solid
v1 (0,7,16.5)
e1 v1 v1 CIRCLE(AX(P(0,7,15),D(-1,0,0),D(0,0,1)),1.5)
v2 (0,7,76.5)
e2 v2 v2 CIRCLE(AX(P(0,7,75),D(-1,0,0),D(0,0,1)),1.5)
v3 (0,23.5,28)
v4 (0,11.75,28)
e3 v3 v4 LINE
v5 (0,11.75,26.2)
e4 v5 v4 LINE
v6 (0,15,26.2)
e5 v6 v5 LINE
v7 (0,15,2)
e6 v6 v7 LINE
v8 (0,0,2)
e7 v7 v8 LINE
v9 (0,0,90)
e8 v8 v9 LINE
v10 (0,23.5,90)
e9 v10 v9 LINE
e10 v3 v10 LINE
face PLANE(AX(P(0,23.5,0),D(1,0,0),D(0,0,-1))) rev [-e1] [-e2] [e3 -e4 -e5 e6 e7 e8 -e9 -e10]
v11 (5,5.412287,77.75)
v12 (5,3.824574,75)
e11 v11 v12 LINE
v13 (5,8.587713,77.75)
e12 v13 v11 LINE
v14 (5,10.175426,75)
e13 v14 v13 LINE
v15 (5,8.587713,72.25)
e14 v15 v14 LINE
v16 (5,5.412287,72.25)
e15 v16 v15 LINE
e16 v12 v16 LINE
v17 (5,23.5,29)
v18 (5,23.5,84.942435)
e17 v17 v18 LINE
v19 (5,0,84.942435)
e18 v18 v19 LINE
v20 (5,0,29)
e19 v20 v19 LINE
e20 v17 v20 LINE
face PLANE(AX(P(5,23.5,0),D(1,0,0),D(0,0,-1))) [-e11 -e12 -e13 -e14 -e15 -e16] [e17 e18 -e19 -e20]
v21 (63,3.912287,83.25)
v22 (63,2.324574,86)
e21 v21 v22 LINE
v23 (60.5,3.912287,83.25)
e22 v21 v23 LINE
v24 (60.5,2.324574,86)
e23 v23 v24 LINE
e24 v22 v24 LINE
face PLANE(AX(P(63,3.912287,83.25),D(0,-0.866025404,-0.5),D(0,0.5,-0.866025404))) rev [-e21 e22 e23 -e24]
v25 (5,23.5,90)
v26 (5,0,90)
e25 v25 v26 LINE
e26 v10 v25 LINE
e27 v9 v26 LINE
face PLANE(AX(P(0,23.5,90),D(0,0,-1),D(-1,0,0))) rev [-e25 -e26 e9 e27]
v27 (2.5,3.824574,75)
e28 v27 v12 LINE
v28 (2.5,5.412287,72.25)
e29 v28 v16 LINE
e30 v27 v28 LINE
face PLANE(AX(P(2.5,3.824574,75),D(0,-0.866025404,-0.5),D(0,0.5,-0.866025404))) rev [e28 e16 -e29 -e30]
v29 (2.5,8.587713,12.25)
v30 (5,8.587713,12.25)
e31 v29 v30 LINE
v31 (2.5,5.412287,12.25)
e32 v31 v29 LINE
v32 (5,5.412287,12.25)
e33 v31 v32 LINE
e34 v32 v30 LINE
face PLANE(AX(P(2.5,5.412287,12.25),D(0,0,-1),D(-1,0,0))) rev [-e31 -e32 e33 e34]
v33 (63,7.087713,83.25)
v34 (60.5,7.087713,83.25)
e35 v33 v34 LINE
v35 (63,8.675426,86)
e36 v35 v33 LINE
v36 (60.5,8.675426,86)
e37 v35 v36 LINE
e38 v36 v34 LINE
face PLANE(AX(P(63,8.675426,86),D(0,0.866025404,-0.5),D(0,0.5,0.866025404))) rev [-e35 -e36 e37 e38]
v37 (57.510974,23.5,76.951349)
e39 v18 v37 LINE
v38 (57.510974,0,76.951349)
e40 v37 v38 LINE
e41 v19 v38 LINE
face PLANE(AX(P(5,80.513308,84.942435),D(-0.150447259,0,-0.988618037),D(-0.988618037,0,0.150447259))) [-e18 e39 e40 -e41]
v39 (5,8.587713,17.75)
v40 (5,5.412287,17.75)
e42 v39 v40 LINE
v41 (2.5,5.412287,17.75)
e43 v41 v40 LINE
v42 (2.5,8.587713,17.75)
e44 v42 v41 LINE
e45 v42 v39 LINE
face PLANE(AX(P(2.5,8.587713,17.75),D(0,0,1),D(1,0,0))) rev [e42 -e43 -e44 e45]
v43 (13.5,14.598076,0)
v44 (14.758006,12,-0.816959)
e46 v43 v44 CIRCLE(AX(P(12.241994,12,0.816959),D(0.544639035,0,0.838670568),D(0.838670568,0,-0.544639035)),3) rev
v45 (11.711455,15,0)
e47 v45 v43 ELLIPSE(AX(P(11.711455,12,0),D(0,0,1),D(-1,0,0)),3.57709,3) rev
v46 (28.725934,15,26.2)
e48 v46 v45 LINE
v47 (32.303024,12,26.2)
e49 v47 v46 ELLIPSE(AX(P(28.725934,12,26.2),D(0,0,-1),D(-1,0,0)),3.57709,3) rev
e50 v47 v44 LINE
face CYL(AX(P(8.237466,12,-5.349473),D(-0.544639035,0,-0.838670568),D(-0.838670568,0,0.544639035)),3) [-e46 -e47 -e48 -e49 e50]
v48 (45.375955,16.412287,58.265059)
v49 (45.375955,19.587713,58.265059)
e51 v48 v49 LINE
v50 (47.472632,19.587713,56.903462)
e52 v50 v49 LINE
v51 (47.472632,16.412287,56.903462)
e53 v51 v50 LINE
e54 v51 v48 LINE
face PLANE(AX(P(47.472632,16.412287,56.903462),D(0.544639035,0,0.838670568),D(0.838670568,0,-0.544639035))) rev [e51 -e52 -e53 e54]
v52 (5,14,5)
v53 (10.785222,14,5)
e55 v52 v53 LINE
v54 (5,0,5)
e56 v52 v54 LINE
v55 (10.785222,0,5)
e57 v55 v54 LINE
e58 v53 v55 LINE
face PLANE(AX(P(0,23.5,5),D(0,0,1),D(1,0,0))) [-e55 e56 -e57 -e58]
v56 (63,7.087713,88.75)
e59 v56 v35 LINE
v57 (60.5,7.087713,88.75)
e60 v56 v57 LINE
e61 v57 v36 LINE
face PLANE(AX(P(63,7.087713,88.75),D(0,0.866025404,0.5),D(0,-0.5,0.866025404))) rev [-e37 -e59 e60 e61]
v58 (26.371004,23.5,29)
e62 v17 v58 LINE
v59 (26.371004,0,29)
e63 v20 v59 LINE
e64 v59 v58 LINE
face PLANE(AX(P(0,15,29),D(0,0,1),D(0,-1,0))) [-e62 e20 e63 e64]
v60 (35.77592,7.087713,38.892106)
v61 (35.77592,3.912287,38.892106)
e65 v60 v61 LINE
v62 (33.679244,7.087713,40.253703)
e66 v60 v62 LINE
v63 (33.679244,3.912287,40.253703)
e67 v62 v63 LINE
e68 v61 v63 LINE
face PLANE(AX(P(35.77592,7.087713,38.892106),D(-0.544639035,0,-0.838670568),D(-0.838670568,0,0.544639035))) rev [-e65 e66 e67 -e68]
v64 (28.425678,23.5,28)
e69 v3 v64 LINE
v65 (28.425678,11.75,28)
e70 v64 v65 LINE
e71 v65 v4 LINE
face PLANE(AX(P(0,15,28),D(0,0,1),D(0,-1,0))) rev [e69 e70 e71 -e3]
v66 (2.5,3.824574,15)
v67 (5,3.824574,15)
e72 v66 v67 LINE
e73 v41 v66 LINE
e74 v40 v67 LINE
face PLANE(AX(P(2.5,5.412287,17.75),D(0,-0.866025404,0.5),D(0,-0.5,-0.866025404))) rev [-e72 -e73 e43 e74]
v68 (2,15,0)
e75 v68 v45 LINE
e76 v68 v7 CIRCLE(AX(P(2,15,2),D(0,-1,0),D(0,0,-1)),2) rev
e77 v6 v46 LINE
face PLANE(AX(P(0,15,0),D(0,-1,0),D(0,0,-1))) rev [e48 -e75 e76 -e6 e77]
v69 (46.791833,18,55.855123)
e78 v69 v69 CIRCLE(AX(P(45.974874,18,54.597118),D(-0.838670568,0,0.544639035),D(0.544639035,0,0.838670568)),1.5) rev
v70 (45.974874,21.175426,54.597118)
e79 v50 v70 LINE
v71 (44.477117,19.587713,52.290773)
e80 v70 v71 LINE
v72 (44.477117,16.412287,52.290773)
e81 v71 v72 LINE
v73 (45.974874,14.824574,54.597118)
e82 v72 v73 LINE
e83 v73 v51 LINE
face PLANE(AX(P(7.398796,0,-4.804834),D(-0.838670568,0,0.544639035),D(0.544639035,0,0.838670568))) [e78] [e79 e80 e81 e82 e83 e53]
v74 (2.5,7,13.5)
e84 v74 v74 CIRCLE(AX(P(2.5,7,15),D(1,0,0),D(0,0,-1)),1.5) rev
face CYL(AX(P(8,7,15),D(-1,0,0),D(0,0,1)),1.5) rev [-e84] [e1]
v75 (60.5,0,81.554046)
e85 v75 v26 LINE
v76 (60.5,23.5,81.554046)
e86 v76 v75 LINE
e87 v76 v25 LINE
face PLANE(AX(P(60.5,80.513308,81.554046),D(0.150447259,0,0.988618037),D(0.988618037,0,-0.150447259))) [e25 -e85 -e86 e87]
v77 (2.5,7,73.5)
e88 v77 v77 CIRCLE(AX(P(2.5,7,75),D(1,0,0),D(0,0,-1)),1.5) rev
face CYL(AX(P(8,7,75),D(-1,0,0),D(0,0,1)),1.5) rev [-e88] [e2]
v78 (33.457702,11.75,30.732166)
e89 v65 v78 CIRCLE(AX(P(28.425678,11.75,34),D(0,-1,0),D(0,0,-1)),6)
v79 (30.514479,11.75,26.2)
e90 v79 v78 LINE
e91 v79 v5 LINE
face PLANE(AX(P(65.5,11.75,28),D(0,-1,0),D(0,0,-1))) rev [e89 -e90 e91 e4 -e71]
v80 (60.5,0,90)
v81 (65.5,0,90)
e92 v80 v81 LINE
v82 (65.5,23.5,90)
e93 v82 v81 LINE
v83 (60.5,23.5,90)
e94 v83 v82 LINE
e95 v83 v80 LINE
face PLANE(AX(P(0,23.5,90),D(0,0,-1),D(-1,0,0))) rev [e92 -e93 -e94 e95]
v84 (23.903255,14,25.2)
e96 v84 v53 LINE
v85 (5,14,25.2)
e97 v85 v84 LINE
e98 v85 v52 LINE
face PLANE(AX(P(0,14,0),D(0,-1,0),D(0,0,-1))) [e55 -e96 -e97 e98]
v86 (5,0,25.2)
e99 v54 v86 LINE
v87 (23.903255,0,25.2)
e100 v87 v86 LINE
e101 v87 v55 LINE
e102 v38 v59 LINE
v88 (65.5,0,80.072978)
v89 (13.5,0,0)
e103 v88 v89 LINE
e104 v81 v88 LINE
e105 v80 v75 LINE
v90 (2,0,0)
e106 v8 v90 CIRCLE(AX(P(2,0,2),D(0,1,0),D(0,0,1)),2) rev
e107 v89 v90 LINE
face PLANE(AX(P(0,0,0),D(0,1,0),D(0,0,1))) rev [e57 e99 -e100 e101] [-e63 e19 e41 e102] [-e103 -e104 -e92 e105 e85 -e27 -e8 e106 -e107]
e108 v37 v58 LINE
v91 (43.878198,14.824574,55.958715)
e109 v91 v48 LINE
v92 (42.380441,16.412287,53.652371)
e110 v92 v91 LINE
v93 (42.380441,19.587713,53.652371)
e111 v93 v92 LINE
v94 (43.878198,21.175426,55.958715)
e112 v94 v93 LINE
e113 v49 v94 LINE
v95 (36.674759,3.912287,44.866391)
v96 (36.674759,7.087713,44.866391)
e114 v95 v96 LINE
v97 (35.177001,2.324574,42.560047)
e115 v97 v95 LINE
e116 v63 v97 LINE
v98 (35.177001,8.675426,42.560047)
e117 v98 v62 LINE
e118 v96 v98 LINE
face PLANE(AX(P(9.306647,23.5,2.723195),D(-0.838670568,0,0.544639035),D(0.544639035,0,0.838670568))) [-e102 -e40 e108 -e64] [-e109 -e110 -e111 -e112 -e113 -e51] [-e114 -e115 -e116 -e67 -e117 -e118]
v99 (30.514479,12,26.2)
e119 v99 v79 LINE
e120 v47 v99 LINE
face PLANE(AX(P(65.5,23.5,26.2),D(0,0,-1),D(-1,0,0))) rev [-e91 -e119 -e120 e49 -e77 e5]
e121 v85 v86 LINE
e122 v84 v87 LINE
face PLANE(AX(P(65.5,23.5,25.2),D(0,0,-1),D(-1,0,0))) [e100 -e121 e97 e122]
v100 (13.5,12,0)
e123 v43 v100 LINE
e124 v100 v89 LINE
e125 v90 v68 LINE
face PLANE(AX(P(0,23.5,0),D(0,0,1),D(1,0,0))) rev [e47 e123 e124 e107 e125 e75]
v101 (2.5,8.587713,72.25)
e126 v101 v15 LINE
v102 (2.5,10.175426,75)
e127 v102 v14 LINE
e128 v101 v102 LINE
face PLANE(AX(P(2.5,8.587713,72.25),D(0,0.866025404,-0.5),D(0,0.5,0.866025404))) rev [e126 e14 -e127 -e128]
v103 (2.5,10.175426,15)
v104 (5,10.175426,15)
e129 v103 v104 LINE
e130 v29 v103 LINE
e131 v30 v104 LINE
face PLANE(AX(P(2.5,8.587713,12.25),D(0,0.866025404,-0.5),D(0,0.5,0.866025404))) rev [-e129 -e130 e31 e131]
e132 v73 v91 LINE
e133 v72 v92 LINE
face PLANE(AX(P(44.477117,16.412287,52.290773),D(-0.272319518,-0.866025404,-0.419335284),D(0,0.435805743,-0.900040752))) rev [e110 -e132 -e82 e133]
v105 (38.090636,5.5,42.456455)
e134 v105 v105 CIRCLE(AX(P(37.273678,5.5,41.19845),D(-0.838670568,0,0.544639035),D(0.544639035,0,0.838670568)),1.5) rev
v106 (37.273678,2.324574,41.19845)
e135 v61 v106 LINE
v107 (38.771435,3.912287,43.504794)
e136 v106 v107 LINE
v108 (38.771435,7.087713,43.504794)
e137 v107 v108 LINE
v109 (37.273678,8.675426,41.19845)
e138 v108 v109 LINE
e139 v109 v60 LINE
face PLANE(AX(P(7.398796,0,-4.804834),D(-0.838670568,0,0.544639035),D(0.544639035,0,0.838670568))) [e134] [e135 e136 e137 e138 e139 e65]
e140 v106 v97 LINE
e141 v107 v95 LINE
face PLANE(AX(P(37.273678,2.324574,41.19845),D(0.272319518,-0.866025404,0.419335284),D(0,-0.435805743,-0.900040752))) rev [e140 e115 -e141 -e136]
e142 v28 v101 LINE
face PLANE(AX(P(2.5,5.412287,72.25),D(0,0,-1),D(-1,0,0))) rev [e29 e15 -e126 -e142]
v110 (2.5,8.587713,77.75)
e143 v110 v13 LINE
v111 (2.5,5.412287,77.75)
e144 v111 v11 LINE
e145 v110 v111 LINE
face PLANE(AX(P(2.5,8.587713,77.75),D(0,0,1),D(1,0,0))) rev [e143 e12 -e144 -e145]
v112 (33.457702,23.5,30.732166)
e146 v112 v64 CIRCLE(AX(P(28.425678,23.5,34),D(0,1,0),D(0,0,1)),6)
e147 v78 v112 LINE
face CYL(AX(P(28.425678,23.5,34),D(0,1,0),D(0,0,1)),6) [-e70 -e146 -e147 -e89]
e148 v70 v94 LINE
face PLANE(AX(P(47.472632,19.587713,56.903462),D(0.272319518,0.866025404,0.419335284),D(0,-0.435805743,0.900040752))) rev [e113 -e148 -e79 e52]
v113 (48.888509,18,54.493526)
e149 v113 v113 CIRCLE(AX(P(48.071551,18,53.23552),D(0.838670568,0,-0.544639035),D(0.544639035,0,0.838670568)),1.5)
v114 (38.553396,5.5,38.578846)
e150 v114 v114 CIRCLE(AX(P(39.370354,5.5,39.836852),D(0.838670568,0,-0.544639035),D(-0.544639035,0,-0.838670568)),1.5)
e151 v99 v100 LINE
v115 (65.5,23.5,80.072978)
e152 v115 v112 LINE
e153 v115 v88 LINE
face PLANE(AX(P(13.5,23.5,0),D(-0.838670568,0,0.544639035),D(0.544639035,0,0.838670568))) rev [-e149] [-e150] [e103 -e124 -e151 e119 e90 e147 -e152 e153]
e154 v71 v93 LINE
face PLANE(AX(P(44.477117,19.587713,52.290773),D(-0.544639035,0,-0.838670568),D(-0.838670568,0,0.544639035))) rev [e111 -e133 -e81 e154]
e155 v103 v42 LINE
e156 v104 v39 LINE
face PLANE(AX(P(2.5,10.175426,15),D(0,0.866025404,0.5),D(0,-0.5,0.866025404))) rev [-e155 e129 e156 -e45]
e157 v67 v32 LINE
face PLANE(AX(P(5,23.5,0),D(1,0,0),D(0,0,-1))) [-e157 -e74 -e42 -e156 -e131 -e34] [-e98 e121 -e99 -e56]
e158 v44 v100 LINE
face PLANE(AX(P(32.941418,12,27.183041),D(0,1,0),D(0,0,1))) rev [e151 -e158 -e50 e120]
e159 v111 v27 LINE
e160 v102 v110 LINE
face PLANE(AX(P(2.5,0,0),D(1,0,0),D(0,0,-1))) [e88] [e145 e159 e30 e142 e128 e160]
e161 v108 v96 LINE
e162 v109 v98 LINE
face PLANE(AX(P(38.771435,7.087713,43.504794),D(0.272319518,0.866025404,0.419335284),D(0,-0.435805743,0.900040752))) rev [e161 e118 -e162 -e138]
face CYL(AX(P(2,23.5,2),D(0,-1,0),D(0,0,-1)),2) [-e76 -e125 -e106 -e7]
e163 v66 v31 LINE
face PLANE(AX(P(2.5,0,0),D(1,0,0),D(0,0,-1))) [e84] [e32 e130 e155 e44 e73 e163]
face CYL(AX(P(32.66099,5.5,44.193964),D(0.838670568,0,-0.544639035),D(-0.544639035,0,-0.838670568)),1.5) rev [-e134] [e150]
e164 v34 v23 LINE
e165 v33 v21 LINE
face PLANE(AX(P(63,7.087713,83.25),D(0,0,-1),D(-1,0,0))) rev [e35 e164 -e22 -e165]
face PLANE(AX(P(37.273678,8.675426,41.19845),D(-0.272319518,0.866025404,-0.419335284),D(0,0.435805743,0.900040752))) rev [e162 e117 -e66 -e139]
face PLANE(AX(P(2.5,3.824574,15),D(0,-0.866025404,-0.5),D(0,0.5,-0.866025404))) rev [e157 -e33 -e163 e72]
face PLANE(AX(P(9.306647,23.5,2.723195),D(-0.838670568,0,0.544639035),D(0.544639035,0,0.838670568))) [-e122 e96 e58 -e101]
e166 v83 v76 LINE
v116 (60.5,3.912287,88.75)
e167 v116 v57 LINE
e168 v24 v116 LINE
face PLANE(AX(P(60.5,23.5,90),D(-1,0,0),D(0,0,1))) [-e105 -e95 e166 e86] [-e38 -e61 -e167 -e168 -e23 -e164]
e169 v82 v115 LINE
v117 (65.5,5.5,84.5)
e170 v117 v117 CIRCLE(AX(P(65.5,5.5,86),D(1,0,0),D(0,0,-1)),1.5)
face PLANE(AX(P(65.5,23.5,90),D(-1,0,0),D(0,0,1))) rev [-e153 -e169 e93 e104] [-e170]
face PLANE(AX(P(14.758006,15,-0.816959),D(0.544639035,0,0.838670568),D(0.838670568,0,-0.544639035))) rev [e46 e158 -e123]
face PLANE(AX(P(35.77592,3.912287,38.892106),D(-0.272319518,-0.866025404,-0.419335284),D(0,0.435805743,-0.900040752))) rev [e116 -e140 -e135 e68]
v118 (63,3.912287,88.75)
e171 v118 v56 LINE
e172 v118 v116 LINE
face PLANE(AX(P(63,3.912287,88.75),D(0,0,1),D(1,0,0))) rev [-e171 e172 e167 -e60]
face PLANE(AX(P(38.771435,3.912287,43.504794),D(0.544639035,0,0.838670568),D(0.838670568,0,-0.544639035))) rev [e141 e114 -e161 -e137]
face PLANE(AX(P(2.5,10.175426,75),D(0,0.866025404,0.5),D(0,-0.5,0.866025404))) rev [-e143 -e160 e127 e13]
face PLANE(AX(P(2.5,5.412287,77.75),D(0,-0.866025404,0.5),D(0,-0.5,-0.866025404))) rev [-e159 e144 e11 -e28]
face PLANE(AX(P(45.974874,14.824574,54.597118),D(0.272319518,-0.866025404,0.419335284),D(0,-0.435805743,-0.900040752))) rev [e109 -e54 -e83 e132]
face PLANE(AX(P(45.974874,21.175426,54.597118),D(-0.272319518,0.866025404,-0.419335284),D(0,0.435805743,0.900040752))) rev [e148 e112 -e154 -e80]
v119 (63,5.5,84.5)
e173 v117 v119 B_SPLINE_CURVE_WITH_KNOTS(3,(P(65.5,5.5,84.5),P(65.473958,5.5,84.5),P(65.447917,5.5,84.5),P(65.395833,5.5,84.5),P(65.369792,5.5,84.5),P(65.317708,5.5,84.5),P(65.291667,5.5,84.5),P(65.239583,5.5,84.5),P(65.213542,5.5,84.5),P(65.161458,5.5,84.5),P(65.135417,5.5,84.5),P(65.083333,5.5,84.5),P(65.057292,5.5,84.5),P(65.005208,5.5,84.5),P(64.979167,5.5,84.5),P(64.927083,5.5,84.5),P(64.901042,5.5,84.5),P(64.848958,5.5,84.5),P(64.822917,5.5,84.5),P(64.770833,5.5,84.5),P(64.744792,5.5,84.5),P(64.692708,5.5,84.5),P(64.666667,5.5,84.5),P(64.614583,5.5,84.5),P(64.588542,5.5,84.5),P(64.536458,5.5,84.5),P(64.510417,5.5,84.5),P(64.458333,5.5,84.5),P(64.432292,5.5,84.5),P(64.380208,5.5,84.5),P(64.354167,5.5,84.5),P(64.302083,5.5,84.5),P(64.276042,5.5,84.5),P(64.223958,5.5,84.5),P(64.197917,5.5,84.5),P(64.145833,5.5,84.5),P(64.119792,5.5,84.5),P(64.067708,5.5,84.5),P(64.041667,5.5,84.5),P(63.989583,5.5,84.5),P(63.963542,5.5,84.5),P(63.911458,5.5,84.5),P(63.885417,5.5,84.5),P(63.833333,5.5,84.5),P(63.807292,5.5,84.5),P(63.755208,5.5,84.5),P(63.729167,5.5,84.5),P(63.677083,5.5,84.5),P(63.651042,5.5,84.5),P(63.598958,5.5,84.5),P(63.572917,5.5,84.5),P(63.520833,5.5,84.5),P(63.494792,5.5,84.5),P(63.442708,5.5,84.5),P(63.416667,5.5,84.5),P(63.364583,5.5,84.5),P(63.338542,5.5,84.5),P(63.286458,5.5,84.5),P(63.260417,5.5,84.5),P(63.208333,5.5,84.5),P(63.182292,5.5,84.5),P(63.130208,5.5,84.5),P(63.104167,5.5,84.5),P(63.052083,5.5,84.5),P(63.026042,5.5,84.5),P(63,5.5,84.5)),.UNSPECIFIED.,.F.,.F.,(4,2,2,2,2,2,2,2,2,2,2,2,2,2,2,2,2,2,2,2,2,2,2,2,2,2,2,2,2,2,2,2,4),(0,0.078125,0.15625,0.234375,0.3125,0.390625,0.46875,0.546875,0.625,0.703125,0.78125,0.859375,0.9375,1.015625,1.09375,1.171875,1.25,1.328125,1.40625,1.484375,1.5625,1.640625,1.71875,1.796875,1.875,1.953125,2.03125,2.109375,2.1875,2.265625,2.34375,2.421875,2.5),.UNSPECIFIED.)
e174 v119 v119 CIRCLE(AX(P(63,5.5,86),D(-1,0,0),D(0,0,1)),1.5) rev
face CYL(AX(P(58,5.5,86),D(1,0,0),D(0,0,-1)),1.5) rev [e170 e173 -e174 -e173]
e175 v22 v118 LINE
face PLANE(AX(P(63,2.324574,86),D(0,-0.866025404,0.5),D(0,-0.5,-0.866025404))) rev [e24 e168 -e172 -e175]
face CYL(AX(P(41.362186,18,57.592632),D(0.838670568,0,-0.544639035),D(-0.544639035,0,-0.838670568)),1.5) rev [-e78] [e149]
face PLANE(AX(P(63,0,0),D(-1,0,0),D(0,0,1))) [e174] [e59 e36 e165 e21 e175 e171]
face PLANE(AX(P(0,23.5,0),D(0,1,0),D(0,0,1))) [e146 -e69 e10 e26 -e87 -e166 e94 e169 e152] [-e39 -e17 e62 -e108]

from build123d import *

# Parameters (mm, degrees)
BOSS_EXTRU_1_DEPTH       = 23.5
ESQUISSE10_W             = 28
ESQUISSE10_H             = 8.5
ENL_V_MAT_EXTRU_9_DEPTH  = 114.765108887
ESQUISSE11_W             = 33.386172199
ESQUISSE11_H             = 3
BOSS_EXTRU_2_DEPTH       = 1.5
ESQUISSE12_W             = 1.8
ESQUISSE12_H             = 11.75
ENL_V_MAT_EXTRU_10_DEPTH = 114.765108887
COQUE2_DEPTH             = 23.5
COQUE2_2_DEPTH           = 10.75
COQUE2_START             = 10.75
COQUE2_3_DEPTH           = 3.25
CONG_2_R                 = 2
CONG_3_R                 = 3
ESQUISSE5_R              = 1.5
ENL_V_MAT_EXTRU_4_DEPTH  = 8
ESQUISSE7_R              = 1.5
ENL_V_MAT_EXTRU_6_DEPTH  = 8
ESQUISSE9_R              = 1.5
ENL_V_MAT_EXTRU_8_DEPTH  = 7.5
BOSS_EXTRU_3_DEPTH       = 23.5
BOSS_EXTRU_4_DEPTH       = 10.75
ENL_V_MAT_EXTRU_11_DEPTH = 2.5
ENL_V_MAT_EXTRU_12_DEPTH = 2.5
ENL_V_MAT_EXTRU_13_DEPTH = 2.5
CONG_5_R                 = 6


# Read off the part's stored shape, not the designer's step: Coque2
with BuildPart() as part:
    # Esquisse1 → Boss.-Extru.1 (new body)
    with BuildSketch(Plane(origin=(0, 0, 0), x_dir=(1, 0, 0), z_dir=(0, 1, 0))):
        Polygon((0, 0), (13.5, 0), (65.5, -80.072978118), (65.5, -90), (0, -90), align=None)
    extrude(amount=BOSS_EXTRU_1_DEPTH)

    # Esquisse10 → Enlèv. mat.-Extru.9 (cut, through all)
    with BuildSketch(Plane(origin=(65.5, 0, 0), x_dir=(0, 0, -1), z_dir=(1, 0, 0))):
        with Locations((-14, 19.25)):
            Rectangle(ESQUISSE10_W, ESQUISSE10_H)
    extrude(amount=-ENL_V_MAT_EXTRU_9_DEPTH, mode=Mode.SUBTRACT)

    # Esquisse11 → Boss.-Extru.2 (add)
    with BuildSketch(Plane(origin=(9.495472341, 0, -6.166431839), x_dir=(-0.5446390350150256, 0, -0.838670567945425), z_dir=(0.8386705679454252, 0, -0.5446390350150256))):
        with Locations((-24.045713072, 13.5)):
            Rectangle(ESQUISSE11_W, ESQUISSE11_H)
    extrude(amount=BOSS_EXTRU_2_DEPTH)

    # Esquisse12 → Enlèv. mat.-Extru.10 (cut, through all)
    with BuildSketch(Plane.ZY):
        with Locations((27.1, 17.625)):
            Rectangle(ESQUISSE12_W, ESQUISSE12_H)
    extrude(amount=-ENL_V_MAT_EXTRU_10_DEPTH, mode=Mode.SUBTRACT)

    # Coque2 outline → Coque2 (cut)
    with BuildSketch(Plane(origin=(0, 0, 0), x_dir=(1, 0, 0), z_dir=(0, 1, 0))):
        Polygon((60.5, -81.554045593), (26.371003739, -29), (5, -29), (5, -90), (60.5, -90), align=None)
    extrude(amount=COQUE2_DEPTH, mode=Mode.SUBTRACT)

    # Coque2 2 outline → Coque2 2 (cut)
    with BuildSketch(Plane(origin=(0, 0, 0), x_dir=(1, 0, 0), z_dir=(0, 1, 0))):
        Polygon((10.785221502, -5), (5, -5), (5, -29), (26.371003739, -29), align=None)
    extrude(amount=COQUE2_2_DEPTH, mode=Mode.SUBTRACT)

    # Coque2 3 outline → Coque2 3 (cut)
    with BuildSketch(Plane(origin=(0, 0, 0), x_dir=(1, 0, 0), z_dir=(0, 1, 0)).offset(COQUE2_START)):
        Polygon((23.903254884, -25.2), (10.785221502, -5), (5, -5), (5, -25.2), align=None)
    extrude(amount=COQUE2_3_DEPTH, mode=Mode.SUBTRACT)

    # Congé2
    cong_2_edges = [part.edges().sort_by_distance(p)[0] for p in [
        (0, 7.5, 0),
    ]]
    fillet(cong_2_edges, radius=CONG_2_R)

    # Congé3
    cong_3_edges = [part.edges().sort_by_distance(p)[0] for p in [
        (23.530514866, 15, 12.691520724),
    ]]
    fillet(cong_3_edges, radius=CONG_3_R - 0.0001)  # a hair under: the kernel refuses the full size

    # Esquisse5 → Enlèv. mat.-Extru.4 (cut)
    with BuildSketch(Plane.ZY):
        with Locations((15, 7)):
            Circle(ESQUISSE5_R)
        with Locations((75, 7)):
            Circle(ESQUISSE5_R)
    extrude(amount=-ENL_V_MAT_EXTRU_4_DEPTH, mode=Mode.SUBTRACT)

    # Esquisse7 → Enlèv. mat.-Extru.6 (cut)
    with BuildSketch(Plane(origin=(9.495472341, 0, -6.166431839), x_dir=(-0.5446390350150254, 0, -0.8386705679454252), z_dir=(0.8386705679454252, 0, -0.5446390350150254))):
        with Locations((-54.852626973, 5.5)):
            Circle(ESQUISSE7_R)
        with Locations(Location((-70.828706829, 18, 0), (0, 0, 180))):
            Circle(ESQUISSE7_R)
    extrude(amount=-ENL_V_MAT_EXTRU_6_DEPTH, mode=Mode.SUBTRACT)

    # Esquisse9 → Enlèv. mat.-Extru.8 (cut)
    with BuildSketch(Plane(origin=(65.5, 0, 0), x_dir=(0, 0, -1), z_dir=(1, 0, 0))):
        with Locations((-86, 5.5)):
            Circle(ESQUISSE9_R)
    extrude(amount=-ENL_V_MAT_EXTRU_8_DEPTH, mode=Mode.SUBTRACT)

    # Esquisse13 → Boss.-Extru.3 (add)
    with BuildSketch(Plane.XZ):
        Polygon((60.5, 81.554045593), (5, 90), (5, 84.94243498), (57.510973677, 76.951348682), align=None)
    extrude(amount=-BOSS_EXTRU_3_DEPTH)

    # Esquisse14 → Boss.-Extru.4 (add)
    with BuildSketch(Plane.XZ.offset(-10.75)):
        Polygon((5, 25.2), (23.903254884, 25.2), (26.371003739, 29), (5, 29), align=None)
    extrude(amount=BOSS_EXTRU_4_DEPTH)

    # Esquisse16 → Enlèv. mat.-Extru.11 (cut)
    with BuildSketch(Plane(origin=(5, 0, 0), x_dir=(0, 0, -1), z_dir=(1, 0, 0))):
        Polygon((-72.25, 8.58771324), (-75, 10.175426481), (-77.75, 8.58771324), (-77.75, 5.41228676), (-75, 3.824573519), (-72.25, 5.41228676), align=None)
        Polygon((-12.25, 8.58771324), (-15, 10.175426481), (-17.75, 8.58771324), (-17.75, 5.41228676), (-15, 3.824573519), (-12.25, 5.41228676), align=None)
    extrude(amount=-ENL_V_MAT_EXTRU_11_DEPTH, mode=Mode.SUBTRACT)

    # Esquisse17 → Enlèv. mat.-Extru.12 (cut)
    with BuildSketch(Plane.ZY.offset(-60.5)):
        Polygon((86, 2.324573519), (88.75, 3.91228676), (88.75, 7.08771324), (86, 8.675426481), (83.25, 7.08771324), (83.25, 3.91228676), align=None)
    extrude(amount=-ENL_V_MAT_EXTRU_12_DEPTH, mode=Mode.SUBTRACT)

    # Esquisse18 → Enlèv. mat.-Extru.13 (cut)
    with BuildSketch(Plane(origin=(5.302119501, 0, -3.443236664), x_dir=(0.5446390350150256, 0, 0.838670567945425), z_dir=(-0.8386705679454252, 0, 0.5446390350150256))):
        Polygon((57.602626973, 7.08771324), (54.852626973, 8.675426481), (52.102626973, 7.08771324), (52.102626973, 3.91228676), (54.852626973, 2.324573519), (57.602626973, 3.91228676), align=None)
        Polygon((73.578706829, 19.58771324), (70.828706829, 21.175426481), (68.078706829, 19.58771324), (68.078706829, 16.41228676), (70.828706829, 14.824573519), (73.578706829, 16.41228676), align=None)
    extrude(amount=-ENL_V_MAT_EXTRU_13_DEPTH, mode=Mode.SUBTRACT)

    # Congé5
    cong_5_edges = [part.edges().sort_by_distance(p)[0] for p in [
        (31.68341261, 17.625, 28),
    ]]
    fillet(cong_5_edges, radius=CONG_5_R)


solid = part.part
